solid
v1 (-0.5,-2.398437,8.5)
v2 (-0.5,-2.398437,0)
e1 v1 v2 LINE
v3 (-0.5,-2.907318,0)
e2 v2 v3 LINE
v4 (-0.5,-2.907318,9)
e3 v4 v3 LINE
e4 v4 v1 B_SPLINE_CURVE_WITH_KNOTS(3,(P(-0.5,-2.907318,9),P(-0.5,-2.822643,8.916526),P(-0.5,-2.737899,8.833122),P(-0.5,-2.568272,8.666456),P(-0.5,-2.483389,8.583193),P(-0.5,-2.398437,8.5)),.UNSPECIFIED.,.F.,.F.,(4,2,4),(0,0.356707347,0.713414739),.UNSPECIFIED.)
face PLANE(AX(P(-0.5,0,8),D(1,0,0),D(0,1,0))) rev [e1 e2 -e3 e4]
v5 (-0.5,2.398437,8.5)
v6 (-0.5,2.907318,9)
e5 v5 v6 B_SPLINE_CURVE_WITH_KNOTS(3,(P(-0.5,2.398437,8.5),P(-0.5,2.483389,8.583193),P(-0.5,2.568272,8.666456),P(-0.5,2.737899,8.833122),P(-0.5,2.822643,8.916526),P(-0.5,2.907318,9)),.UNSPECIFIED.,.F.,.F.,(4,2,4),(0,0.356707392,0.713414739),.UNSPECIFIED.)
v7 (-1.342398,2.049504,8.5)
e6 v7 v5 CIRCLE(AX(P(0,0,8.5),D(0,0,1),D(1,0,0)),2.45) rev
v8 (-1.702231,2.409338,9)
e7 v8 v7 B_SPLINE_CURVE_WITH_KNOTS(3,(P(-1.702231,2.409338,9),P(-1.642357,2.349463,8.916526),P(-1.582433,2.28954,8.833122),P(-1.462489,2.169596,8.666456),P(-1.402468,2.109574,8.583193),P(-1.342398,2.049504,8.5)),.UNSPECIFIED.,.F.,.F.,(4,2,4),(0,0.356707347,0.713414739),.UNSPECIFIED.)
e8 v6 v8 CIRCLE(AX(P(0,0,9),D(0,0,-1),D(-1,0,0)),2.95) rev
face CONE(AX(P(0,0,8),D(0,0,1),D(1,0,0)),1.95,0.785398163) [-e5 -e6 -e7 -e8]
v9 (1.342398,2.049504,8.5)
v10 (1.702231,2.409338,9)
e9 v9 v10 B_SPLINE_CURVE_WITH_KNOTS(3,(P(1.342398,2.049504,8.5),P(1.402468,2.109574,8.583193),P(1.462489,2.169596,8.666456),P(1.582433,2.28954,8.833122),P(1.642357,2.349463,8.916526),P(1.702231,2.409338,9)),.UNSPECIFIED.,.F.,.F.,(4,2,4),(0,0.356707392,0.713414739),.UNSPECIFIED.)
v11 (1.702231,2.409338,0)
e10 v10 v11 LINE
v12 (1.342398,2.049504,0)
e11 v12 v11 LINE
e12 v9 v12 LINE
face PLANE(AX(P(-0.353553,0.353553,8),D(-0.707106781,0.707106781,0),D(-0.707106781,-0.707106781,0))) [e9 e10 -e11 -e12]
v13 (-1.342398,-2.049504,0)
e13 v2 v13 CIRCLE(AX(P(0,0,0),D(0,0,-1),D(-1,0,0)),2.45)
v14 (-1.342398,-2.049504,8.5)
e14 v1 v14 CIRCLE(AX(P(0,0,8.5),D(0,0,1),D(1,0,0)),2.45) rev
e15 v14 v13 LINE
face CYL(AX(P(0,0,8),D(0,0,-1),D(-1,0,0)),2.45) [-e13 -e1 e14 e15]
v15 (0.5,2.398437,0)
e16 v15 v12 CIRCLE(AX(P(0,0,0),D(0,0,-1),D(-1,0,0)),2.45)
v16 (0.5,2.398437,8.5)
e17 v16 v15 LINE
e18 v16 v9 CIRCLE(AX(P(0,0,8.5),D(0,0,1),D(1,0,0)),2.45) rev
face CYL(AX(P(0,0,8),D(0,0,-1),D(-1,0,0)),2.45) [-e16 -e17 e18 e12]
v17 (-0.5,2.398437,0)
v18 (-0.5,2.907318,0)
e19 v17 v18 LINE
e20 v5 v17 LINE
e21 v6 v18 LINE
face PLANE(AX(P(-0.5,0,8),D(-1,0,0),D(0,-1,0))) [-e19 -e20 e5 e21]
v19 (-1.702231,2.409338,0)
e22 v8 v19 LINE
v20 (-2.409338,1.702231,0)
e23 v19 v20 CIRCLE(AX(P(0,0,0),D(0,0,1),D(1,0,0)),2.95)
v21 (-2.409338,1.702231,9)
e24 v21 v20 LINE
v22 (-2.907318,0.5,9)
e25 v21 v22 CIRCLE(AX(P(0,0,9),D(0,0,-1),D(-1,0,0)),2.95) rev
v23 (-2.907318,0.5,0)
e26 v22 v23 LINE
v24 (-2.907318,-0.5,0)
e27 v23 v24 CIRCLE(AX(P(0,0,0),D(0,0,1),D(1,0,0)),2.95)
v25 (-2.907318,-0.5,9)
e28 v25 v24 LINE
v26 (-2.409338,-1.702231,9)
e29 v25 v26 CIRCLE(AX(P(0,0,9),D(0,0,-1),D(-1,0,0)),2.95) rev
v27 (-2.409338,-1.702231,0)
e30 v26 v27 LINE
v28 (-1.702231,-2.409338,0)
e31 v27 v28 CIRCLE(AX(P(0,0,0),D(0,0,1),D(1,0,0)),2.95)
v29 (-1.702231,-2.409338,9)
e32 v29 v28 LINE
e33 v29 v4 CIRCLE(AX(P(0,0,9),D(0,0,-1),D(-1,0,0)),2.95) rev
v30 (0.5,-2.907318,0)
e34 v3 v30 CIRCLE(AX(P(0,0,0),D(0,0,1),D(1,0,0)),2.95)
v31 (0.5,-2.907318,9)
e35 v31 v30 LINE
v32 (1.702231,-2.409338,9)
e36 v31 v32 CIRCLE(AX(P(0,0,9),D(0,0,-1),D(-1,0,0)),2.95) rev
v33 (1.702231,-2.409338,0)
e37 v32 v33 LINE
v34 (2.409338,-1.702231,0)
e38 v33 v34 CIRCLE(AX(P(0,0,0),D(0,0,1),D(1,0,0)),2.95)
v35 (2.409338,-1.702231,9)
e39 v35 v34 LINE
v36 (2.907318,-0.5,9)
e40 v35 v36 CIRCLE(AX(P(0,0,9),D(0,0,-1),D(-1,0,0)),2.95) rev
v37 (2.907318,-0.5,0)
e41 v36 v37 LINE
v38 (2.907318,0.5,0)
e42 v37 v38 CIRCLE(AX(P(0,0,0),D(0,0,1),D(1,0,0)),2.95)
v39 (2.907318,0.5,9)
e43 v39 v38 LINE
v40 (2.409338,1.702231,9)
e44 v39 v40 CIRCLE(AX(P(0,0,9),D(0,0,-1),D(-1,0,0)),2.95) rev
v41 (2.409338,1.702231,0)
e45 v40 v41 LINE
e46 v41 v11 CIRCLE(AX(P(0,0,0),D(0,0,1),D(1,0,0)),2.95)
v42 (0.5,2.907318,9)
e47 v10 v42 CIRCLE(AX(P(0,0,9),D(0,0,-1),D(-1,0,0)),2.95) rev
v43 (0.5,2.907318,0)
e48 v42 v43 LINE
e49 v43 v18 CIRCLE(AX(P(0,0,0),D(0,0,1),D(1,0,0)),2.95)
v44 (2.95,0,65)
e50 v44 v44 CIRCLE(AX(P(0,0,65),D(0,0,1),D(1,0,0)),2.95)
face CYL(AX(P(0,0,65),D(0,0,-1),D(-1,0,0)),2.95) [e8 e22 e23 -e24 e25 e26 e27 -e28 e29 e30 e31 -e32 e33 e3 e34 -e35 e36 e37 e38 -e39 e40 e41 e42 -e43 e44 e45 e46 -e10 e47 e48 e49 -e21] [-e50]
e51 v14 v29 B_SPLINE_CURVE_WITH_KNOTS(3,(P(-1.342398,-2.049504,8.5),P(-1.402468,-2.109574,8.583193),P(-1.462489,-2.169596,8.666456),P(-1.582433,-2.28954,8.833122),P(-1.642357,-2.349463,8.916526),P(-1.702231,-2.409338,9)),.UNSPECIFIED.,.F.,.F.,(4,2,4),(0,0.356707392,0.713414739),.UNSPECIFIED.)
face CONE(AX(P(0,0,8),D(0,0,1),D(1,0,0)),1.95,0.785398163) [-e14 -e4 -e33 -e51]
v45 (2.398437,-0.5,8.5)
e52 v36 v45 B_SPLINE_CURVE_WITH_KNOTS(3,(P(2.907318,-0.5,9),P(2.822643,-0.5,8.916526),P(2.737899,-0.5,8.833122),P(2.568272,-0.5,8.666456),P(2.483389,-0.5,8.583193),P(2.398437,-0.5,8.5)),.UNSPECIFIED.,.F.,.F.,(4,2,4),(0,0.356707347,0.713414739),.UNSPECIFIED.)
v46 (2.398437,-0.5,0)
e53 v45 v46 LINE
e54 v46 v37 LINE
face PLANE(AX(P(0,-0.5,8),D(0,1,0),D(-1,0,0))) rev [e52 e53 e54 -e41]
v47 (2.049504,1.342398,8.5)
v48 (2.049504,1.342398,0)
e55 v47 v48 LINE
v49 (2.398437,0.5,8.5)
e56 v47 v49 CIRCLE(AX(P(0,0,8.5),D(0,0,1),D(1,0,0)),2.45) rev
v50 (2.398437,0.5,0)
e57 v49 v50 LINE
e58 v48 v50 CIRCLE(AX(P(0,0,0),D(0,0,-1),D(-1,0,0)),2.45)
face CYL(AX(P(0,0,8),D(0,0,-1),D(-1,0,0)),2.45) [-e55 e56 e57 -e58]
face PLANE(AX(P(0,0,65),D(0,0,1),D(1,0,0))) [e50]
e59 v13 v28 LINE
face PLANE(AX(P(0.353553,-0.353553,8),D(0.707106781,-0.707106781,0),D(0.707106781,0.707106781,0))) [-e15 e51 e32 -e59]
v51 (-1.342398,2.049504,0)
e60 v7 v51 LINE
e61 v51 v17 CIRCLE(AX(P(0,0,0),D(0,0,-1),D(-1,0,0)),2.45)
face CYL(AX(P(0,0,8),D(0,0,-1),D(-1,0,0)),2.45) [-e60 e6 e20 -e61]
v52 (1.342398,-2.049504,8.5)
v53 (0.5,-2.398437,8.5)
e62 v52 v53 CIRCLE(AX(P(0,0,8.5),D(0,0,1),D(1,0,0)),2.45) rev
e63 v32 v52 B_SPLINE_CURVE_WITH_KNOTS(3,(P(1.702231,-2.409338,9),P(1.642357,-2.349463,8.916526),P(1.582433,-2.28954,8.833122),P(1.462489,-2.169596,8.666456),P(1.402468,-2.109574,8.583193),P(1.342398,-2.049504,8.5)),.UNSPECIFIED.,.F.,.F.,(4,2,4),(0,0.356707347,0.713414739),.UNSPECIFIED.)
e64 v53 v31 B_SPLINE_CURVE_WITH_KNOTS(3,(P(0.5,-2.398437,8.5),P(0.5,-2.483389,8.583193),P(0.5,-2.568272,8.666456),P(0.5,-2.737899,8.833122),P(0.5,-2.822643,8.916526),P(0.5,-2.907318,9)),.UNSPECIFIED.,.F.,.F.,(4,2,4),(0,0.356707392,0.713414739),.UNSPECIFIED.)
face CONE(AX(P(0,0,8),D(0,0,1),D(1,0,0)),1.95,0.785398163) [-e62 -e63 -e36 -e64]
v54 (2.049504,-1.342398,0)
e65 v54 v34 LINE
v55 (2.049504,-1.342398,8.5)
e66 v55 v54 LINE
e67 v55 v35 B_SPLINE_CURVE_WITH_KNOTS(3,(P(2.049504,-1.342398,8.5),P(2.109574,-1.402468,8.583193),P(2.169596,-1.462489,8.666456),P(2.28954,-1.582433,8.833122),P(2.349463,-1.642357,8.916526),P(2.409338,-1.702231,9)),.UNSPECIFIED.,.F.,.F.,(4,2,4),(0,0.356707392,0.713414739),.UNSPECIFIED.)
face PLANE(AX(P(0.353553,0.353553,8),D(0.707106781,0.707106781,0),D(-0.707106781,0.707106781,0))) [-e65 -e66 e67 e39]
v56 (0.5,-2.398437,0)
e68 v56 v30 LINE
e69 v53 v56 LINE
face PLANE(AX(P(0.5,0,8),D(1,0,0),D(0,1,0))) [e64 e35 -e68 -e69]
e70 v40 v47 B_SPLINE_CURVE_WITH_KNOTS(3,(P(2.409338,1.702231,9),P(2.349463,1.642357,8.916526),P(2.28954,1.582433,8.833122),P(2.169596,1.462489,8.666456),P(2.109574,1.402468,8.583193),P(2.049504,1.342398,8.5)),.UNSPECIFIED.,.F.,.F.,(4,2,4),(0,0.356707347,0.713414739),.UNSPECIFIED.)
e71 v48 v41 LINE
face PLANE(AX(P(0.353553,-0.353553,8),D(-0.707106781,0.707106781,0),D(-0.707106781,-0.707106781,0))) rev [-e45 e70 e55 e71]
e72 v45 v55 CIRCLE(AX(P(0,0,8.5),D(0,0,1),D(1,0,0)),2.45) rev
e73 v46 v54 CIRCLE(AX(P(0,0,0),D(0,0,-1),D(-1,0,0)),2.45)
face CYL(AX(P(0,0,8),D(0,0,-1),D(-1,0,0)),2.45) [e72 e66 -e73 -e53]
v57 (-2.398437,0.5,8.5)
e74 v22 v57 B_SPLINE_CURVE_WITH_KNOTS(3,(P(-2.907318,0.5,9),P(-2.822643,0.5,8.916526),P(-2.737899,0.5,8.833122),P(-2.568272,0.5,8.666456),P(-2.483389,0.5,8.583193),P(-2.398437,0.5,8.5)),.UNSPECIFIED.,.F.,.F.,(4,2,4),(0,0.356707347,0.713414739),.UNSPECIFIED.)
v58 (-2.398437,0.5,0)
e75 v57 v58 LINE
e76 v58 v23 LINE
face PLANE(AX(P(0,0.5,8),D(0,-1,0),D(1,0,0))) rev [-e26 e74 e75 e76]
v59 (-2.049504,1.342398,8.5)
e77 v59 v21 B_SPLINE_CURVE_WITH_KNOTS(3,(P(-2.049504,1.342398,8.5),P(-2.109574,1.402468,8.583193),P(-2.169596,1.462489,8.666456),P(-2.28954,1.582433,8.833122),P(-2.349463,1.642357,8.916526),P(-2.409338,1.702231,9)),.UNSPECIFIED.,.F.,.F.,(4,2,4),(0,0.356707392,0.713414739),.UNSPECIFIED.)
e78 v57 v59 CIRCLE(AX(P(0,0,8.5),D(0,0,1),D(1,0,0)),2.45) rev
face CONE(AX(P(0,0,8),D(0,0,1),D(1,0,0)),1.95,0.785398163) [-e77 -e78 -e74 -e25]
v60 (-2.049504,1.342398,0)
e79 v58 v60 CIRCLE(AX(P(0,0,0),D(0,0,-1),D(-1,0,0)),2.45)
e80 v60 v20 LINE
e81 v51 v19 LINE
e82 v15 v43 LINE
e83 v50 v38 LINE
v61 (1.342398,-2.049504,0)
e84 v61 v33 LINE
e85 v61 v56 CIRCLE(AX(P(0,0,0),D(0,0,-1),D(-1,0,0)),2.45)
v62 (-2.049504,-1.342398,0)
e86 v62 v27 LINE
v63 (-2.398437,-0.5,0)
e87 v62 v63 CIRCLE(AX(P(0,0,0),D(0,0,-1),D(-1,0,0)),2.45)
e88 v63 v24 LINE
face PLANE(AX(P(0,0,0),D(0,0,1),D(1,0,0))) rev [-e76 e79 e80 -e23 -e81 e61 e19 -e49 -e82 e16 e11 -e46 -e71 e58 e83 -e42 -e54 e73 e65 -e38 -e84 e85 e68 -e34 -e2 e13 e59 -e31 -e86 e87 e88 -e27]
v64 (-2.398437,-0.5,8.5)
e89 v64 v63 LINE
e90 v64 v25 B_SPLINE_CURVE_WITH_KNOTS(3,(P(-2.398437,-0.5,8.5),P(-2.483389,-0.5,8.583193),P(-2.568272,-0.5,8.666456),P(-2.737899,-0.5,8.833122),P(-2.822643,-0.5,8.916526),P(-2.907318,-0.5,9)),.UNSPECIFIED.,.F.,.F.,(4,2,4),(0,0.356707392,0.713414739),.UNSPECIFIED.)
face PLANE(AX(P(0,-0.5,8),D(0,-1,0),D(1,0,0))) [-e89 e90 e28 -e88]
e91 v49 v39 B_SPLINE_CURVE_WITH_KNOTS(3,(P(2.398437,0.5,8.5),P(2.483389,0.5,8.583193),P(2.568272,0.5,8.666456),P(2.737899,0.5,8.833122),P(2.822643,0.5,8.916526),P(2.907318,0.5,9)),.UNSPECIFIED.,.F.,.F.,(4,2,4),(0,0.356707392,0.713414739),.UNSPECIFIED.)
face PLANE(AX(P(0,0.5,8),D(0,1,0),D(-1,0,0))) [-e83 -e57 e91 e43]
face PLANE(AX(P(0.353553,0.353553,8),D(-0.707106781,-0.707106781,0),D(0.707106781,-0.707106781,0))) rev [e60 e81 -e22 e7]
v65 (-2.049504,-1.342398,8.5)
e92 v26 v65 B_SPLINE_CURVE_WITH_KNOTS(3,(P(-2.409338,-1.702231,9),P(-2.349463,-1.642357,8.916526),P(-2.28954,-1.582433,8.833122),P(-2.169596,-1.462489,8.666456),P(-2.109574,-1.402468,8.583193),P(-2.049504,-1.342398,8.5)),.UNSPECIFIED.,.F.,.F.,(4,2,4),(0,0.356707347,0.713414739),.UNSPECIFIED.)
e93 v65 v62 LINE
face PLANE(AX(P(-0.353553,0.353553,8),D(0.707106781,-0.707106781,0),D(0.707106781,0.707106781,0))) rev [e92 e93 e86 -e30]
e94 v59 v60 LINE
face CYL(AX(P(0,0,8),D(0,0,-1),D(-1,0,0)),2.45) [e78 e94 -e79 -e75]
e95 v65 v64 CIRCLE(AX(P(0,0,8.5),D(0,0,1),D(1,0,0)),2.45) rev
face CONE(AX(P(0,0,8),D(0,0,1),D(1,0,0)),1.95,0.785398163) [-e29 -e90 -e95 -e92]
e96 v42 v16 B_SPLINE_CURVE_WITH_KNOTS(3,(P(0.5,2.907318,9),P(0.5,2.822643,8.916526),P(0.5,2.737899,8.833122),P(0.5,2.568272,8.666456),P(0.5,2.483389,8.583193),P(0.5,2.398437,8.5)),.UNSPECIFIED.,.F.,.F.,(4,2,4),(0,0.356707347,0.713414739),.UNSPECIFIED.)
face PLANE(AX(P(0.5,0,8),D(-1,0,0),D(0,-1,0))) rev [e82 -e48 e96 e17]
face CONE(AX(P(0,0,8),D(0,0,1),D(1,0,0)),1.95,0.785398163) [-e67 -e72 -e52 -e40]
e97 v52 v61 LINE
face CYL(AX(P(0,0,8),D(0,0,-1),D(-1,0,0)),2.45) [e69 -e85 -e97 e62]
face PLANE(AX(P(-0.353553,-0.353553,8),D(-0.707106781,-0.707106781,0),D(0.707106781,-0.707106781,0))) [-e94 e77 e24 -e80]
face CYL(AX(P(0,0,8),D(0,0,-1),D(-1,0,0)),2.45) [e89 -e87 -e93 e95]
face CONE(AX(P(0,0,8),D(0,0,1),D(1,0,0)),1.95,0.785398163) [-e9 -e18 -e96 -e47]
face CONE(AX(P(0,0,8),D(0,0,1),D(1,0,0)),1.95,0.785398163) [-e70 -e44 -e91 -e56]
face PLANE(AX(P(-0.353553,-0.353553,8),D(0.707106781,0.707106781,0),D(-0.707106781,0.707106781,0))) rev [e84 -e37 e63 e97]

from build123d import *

# Parameters (mm, degrees)
SKETCH1_R           = 2.95
BOSS_EXTRUDE1_DEPTH = 65
CUT_EXTRUDE1_DEPTH  = 8
CHAMFER1_SIZE       = 1


with BuildPart() as part:
    # Sketch1 → Boss-Extrude1 (new body)
    with BuildSketch(Plane.XY):
        Circle(SKETCH1_R)
    extrude(amount=BOSS_EXTRUDE1_DEPTH)

    # Sketch2 → Cut-Extrude1 (cut)
    with BuildSketch(Plane(origin=(0, 0, 0), x_dir=(-1, 0, 0), z_dir=(0, 0, -1))):
        with BuildLine():
            ThreePointArc((-2.398436991, 0.5), (-2.263504855, 0.937574409), (-2.049504451, 1.34239767))
            Line((-2.049504451, 1.34239767), (-2.409337912, 1.702231131))
            ThreePointArc((-2.409337912, 1.702231131), (-2.725444621, 1.128916125), (-2.907318352, 0.5))
            Line((-2.907318352, 0.5), (-2.398436991, 0.5))
        make_face()
        with BuildLine():
            ThreePointArc((-1.34239767, 2.049504451), (-0.937574409, 2.263504855), (-0.5, 2.398436991))
            Line((-0.5, 2.398436991), (-0.5, 2.907318352))
            ThreePointArc((-0.5, 2.907318352), (-1.128916125, 2.725444621), (-1.702231131, 2.409337912))
            Line((-1.702231131, 2.409337912), (-1.34239767, 2.049504451))
        make_face()
        with BuildLine():
            Line((0.5, 2.907318352), (0.5, 2.398436991))
            ThreePointArc((0.5, 2.398436991), (0.937574409, 2.263504855), (1.34239767, 2.049504451))
            Line((1.34239767, 2.049504451), (1.702231131, 2.409337912))
            ThreePointArc((1.702231131, 2.409337912), (1.128916125, 2.725444621), (0.5, 2.907318352))
        make_face()
        with BuildLine():
            Line((2.409337912, 1.702231131), (2.049504451, 1.34239767))
            ThreePointArc((2.049504451, 1.34239767), (2.263504855, 0.937574409), (2.398436991, 0.5))
            Line((2.398436991, 0.5), (2.907318352, 0.5))
            ThreePointArc((2.907318352, 0.5), (2.725444621, 1.128916125), (2.409337912, 1.702231131))
        make_face()
        with BuildLine():
            Line((2.907318352, -0.5), (2.398436991, -0.5))
            ThreePointArc((2.398436991, -0.5), (2.263504855, -0.937574409), (2.049504451, -1.34239767))
            Line((2.049504451, -1.34239767), (2.409337912, -1.702231131))
            ThreePointArc((2.409337912, -1.702231131), (2.725444621, -1.128916125), (2.907318352, -0.5))
        make_face()
        with BuildLine():
            Line((1.702231131, -2.409337912), (1.34239767, -2.049504451))
            ThreePointArc((1.34239767, -2.049504451), (0.937574409, -2.263504855), (0.5, -2.398436991))
            Line((0.5, -2.398436991), (0.5, -2.907318352))
            ThreePointArc((0.5, -2.907318352), (1.128916125, -2.725444621), (1.702231131, -2.409337912))
        make_face()
        with BuildLine():
            ThreePointArc((-0.5, -2.398436991), (-0.937574409, -2.263504855), (-1.34239767, -2.049504451))
            Line((-1.34239767, -2.049504451), (-1.702231131, -2.409337912))
            ThreePointArc((-1.702231131, -2.409337912), (-1.128916125, -2.725444621), (-0.5, -2.907318352))
            Line((-0.5, -2.907318352), (-0.5, -2.398436991))
        make_face()
        with BuildLine():
            ThreePointArc((-2.049504451, -1.34239767), (-2.263504855, -0.937574409), (-2.398436991, -0.5))
            Line((-2.398436991, -0.5), (-2.907318352, -0.5))
            ThreePointArc((-2.907318352, -0.5), (-2.725444621, -1.128916125), (-2.409337912, -1.702231131))
            Line((-2.409337912, -1.702231131), (-2.049504451, -1.34239767))
        make_face()
    extrude(amount=-CUT_EXTRUDE1_DEPTH, mode=Mode.SUBTRACT)

    # Chamfer1
    # the kernel refuses this chamfer: 1 mm, written as the material it takes off along each edge
    with BuildSketch(Plane(origin=(0, 0, 8), x_dir=(0.6453423073627431, -0.7638935176631171, 0), z_dir=(0.7638935176631171, 0.6453423073627431, 0))) as chamfer1_piece_1_section:
        Polygon((2.95, -CHAMFER1_SIZE), (2.95 - CHAMFER1_SIZE, 0), (2.95, 0), align=None)
    chamfer1_piece_1 = revolve(axis=Axis((0, 0, 8), (0, 0, -1)), revolution_arc=125.382690704, mode=Mode.PRIVATE)
    chamfer1_piece_1 = split(chamfer1_piece_1, bisect_by=Plane(origin=(0.5, 0, 8), z_dir=(1, 0, 0)), keep=Keep.TOP, mode=Mode.PRIVATE)
    chamfer1_piece_1 = split(chamfer1_piece_1, bisect_by=Plane(origin=(-0.353553391, -0.353553391, 8), z_dir=(-0.7071067811865415, -0.7071067811865537, 0)), keep=Keep.TOP, mode=Mode.PRIVATE)
    chamfer1_piece_1 = chamfer1_piece_1 - Plane(origin=(0, 0, 8), x_dir=(0.20408163265306725, -0.9789538738948115, 0), z_dir=(0, 0, -1)) * Cylinder(2.45, 12, mode=Mode.PRIVATE)
    add(chamfer1_piece_1, mode=Mode.SUBTRACT)
    with BuildSketch(Plane(origin=(0, 0, 8), x_dir=(0.6453423073627431, -0.7638935176631171, 0), z_dir=(0.7638935176631171, 0.6453423073627431, 0))) as chamfer1_piece_2_section:
        Polygon((2.95, -CHAMFER1_SIZE), (2.95 - CHAMFER1_SIZE, 0), (2.95, 0), align=None)
    chamfer1_piece_2 = revolve(axis=Axis((0, 0, 8), (0, 0, -1)), revolution_arc=125.382690704, mode=Mode.PRIVATE)
    chamfer1_piece_2 = split(chamfer1_piece_2, bisect_by=Plane(origin=(0.353553391, -0.353553391, 8), z_dir=(0.7071067811865517, -0.7071067811865434, 0)), keep=Keep.TOP, mode=Mode.PRIVATE)
    chamfer1_piece_2 = split(chamfer1_piece_2, bisect_by=Plane(origin=(-0.5, 0, 8), z_dir=(-1, 0, 0)), keep=Keep.TOP, mode=Mode.PRIVATE)
    chamfer1_piece_2 = chamfer1_piece_2 - Plane(origin=(0, 0, 8), x_dir=(0.20408163265306725, -0.9789538738948115, 0), z_dir=(0, 0, -1)) * Cylinder(2.45, 12, mode=Mode.PRIVATE)
    add(chamfer1_piece_2, mode=Mode.SUBTRACT)
    with BuildSketch(Plane(origin=(0, 0, 8), x_dir=(0.6453423073627431, -0.7638935176631171, 0), z_dir=(0.7638935176631171, 0.6453423073627431, 0))) as chamfer1_piece_3_section:
        Polygon((2.95, -CHAMFER1_SIZE), (2.95 - CHAMFER1_SIZE, 0), (2.95, 0), align=None)
    chamfer1_piece_3 = revolve(axis=Axis((0, 0, 8), (0, 0, -1)), revolution_arc=125.382690704, mode=Mode.PRIVATE)
    chamfer1_piece_3 = split(chamfer1_piece_3, bisect_by=Plane(origin=(0, -0.5, 8), z_dir=(0, -1, 0)), keep=Keep.TOP, mode=Mode.PRIVATE)
    chamfer1_piece_3 = split(chamfer1_piece_3, bisect_by=Plane(origin=(-0.353553391, 0.353553391, 8), z_dir=(-0.7071067811865515, 0.7071067811865437, 0)), keep=Keep.TOP, mode=Mode.PRIVATE)
    chamfer1_piece_3 = chamfer1_piece_3 - Plane(origin=(0, 0, 8), x_dir=(0.20408163265306725, -0.9789538738948115, 0), z_dir=(0, 0, -1)) * Cylinder(2.45, 12, mode=Mode.PRIVATE)
    add(chamfer1_piece_3, mode=Mode.SUBTRACT)
    with BuildSketch(Plane(origin=(0, 0, 8), x_dir=(-0.083828364721268, -0.9964802081668046, 0), z_dir=(0.9964802081668046, -0.083828364721268, 0))) as chamfer1_piece_4_section:
        Polygon((2.95, -CHAMFER1_SIZE), (2.95 - CHAMFER1_SIZE, 0), (2.95, 0), align=None)
    chamfer1_piece_4 = revolve(axis=Axis((0, 0, 8), (0, 0, -1)), revolution_arc=125.382690704, mode=Mode.PRIVATE)
    chamfer1_piece_4 = split(chamfer1_piece_4, bisect_by=Plane(origin=(0.353553391, -0.353553391, 8), z_dir=(0.7071067811865517, -0.7071067811865434, 0)), keep=Keep.TOP, mode=Mode.PRIVATE)
    chamfer1_piece_4 = split(chamfer1_piece_4, bisect_by=Plane(origin=(-0.5, 0, 8), z_dir=(-1, 0, 0)), keep=Keep.TOP, mode=Mode.PRIVATE)
    chamfer1_piece_4 = chamfer1_piece_4 - Plane(origin=(0, 0, 8), x_dir=(-0.5479174163352548, -0.8365324290644679, 0), z_dir=(0, 0, -1)) * Cylinder(2.45, 12, mode=Mode.PRIVATE)
    add(chamfer1_piece_4, mode=Mode.SUBTRACT)
    with BuildSketch(Plane(origin=(0, 0, 8), x_dir=(-0.083828364721268, -0.9964802081668046, 0), z_dir=(0.9964802081668046, -0.083828364721268, 0))) as chamfer1_piece_5_section:
        Polygon((2.95, -CHAMFER1_SIZE), (2.95 - CHAMFER1_SIZE, 0), (2.95, 0), align=None)
    chamfer1_piece_5 = revolve(axis=Axis((0, 0, 8), (0, 0, -1)), revolution_arc=125.382690704, mode=Mode.PRIVATE)
    chamfer1_piece_5 = split(chamfer1_piece_5, bisect_by=Plane(origin=(0, -0.5, 8), z_dir=(0, -1, 0)), keep=Keep.TOP, mode=Mode.PRIVATE)
    chamfer1_piece_5 = split(chamfer1_piece_5, bisect_by=Plane(origin=(-0.353553391, 0.353553391, 8), z_dir=(-0.7071067811865515, 0.7071067811865437, 0)), keep=Keep.TOP, mode=Mode.PRIVATE)
    chamfer1_piece_5 = chamfer1_piece_5 - Plane(origin=(0, 0, 8), x_dir=(-0.5479174163352548, -0.8365324290644679, 0), z_dir=(0, 0, -1)) * Cylinder(2.45, 12, mode=Mode.PRIVATE)
    add(chamfer1_piece_5, mode=Mode.SUBTRACT)
    with BuildSketch(Plane(origin=(0, 0, 8), x_dir=(-0.083828364721268, -0.9964802081668046, 0), z_dir=(0.9964802081668046, -0.083828364721268, 0))) as chamfer1_piece_6_section:
        Polygon((2.95, -CHAMFER1_SIZE), (2.95 - CHAMFER1_SIZE, 0), (2.95, 0), align=None)
    chamfer1_piece_6 = revolve(axis=Axis((0, 0, 8), (0, 0, -1)), revolution_arc=125.382690704, mode=Mode.PRIVATE)
    chamfer1_piece_6 = split(chamfer1_piece_6, bisect_by=Plane(origin=(-0.353553391, -0.353553391, 8), z_dir=(-0.7071067811865454, -0.7071067811865497, 0)), keep=Keep.TOP, mode=Mode.PRIVATE)
    chamfer1_piece_6 = split(chamfer1_piece_6, bisect_by=Plane(origin=(0, 0.5, 8), z_dir=(0, 1, 0)), keep=Keep.TOP, mode=Mode.PRIVATE)
    chamfer1_piece_6 = chamfer1_piece_6 - Plane(origin=(0, 0, 8), x_dir=(-0.5479174163352548, -0.8365324290644679, 0), z_dir=(0, 0, -1)) * Cylinder(2.45, 12, mode=Mode.PRIVATE)
    add(chamfer1_piece_6, mode=Mode.SUBTRACT)
    with BuildSketch(Plane(origin=(0, 0, 8), x_dir=(-0.7638935176631205, -0.645342307362739, 0), z_dir=(0.645342307362739, -0.7638935176631205, 0))) as chamfer1_piece_7_section:
        Polygon((2.95, -CHAMFER1_SIZE), (2.95 - CHAMFER1_SIZE, 0), (2.95, 0), align=None)
    chamfer1_piece_7 = revolve(axis=Axis((0, 0, 8), (0, 0, -1)), revolution_arc=125.382690704, mode=Mode.PRIVATE)
    chamfer1_piece_7 = split(chamfer1_piece_7, bisect_by=Plane(origin=(0, -0.5, 8), z_dir=(0, -1, 0)), keep=Keep.TOP, mode=Mode.PRIVATE)
    chamfer1_piece_7 = split(chamfer1_piece_7, bisect_by=Plane(origin=(-0.353553391, 0.353553391, 8), z_dir=(-0.7071067811865515, 0.7071067811865437, 0)), keep=Keep.TOP, mode=Mode.PRIVATE)
    chamfer1_piece_7 = chamfer1_piece_7 - Plane(origin=(0, 0, 8), x_dir=(-0.9789538738948118, -0.20408163265306617, 0), z_dir=(0, 0, -1)) * Cylinder(2.45, 12, mode=Mode.PRIVATE)
    add(chamfer1_piece_7, mode=Mode.SUBTRACT)
    with BuildSketch(Plane(origin=(0, 0, 8), x_dir=(-0.7638935176631205, -0.645342307362739, 0), z_dir=(0.645342307362739, -0.7638935176631205, 0))) as chamfer1_piece_8_section:
        Polygon((2.95, -CHAMFER1_SIZE), (2.95 - CHAMFER1_SIZE, 0), (2.95, 0), align=None)
    chamfer1_piece_8 = revolve(axis=Axis((0, 0, 8), (0, 0, -1)), revolution_arc=125.382690704, mode=Mode.PRIVATE)
    chamfer1_piece_8 = split(chamfer1_piece_8, bisect_by=Plane(origin=(-0.353553391, -0.353553391, 8), z_dir=(-0.7071067811865454, -0.7071067811865497, 0)), keep=Keep.TOP, mode=Mode.PRIVATE)
    chamfer1_piece_8 = split(chamfer1_piece_8, bisect_by=Plane(origin=(0, 0.5, 8), z_dir=(0, 1, 0)), keep=Keep.TOP, mode=Mode.PRIVATE)
    chamfer1_piece_8 = chamfer1_piece_8 - Plane(origin=(0, 0, 8), x_dir=(-0.9789538738948118, -0.20408163265306617, 0), z_dir=(0, 0, -1)) * Cylinder(2.45, 12, mode=Mode.PRIVATE)
    add(chamfer1_piece_8, mode=Mode.SUBTRACT)
    with BuildSketch(Plane(origin=(0, 0, 8), x_dir=(-0.7638935176631205, -0.645342307362739, 0), z_dir=(0.645342307362739, -0.7638935176631205, 0))) as chamfer1_piece_9_section:
        Polygon((2.95, -CHAMFER1_SIZE), (2.95 - CHAMFER1_SIZE, 0), (2.95, 0), align=None)
    chamfer1_piece_9 = revolve(axis=Axis((0, 0, 8), (0, 0, -1)), revolution_arc=125.382690704, mode=Mode.PRIVATE)
    chamfer1_piece_9 = split(chamfer1_piece_9, bisect_by=Plane(origin=(-0.5, 0, 8), z_dir=(-1, 0, 0)), keep=Keep.TOP, mode=Mode.PRIVATE)
    chamfer1_piece_9 = split(chamfer1_piece_9, bisect_by=Plane(origin=(0.353553391, 0.353553391, 8), z_dir=(0.7071067811865474, 0.7071067811865477, 0)), keep=Keep.TOP, mode=Mode.PRIVATE)
    chamfer1_piece_9 = chamfer1_piece_9 - Plane(origin=(0, 0, 8), x_dir=(-0.9789538738948118, -0.20408163265306617, 0), z_dir=(0, 0, -1)) * Cylinder(2.45, 12, mode=Mode.PRIVATE)
    add(chamfer1_piece_9, mode=Mode.SUBTRACT)
    with BuildSketch(Plane(origin=(0, 0, 8), x_dir=(-0.9964802081668033, 0.08382836472128195, 0), z_dir=(-0.08382836472128195, -0.9964802081668033, 0))) as chamfer1_piece_10_section:
        Polygon((2.95, -CHAMFER1_SIZE), (2.95 - CHAMFER1_SIZE, 0), (2.95, 0), align=None)
    chamfer1_piece_10 = revolve(axis=Axis((0, 0, 8), (0, 0, -1)), revolution_arc=125.382690704, mode=Mode.PRIVATE)
    chamfer1_piece_10 = split(chamfer1_piece_10, bisect_by=Plane(origin=(-0.353553391, -0.353553391, 8), z_dir=(-0.7071067811865454, -0.7071067811865497, 0)), keep=Keep.TOP, mode=Mode.PRIVATE)
    chamfer1_piece_10 = split(chamfer1_piece_10, bisect_by=Plane(origin=(0, 0.5, 8), z_dir=(0, 1, 0)), keep=Keep.TOP, mode=Mode.PRIVATE)
    chamfer1_piece_10 = chamfer1_piece_10 - Plane(origin=(0, 0, 8), x_dir=(-0.836532429064466, 0.5479174163352577, 0), z_dir=(0, 0, -1)) * Cylinder(2.45, 12, mode=Mode.PRIVATE)
    add(chamfer1_piece_10, mode=Mode.SUBTRACT)
    with BuildSketch(Plane(origin=(0, 0, 8), x_dir=(-0.9964802081668033, 0.08382836472128195, 0), z_dir=(-0.08382836472128195, -0.9964802081668033, 0))) as chamfer1_piece_11_section:
        Polygon((2.95, -CHAMFER1_SIZE), (2.95 - CHAMFER1_SIZE, 0), (2.95, 0), align=None)
    chamfer1_piece_11 = revolve(axis=Axis((0, 0, 8), (0, 0, -1)), revolution_arc=125.382690704, mode=Mode.PRIVATE)
    chamfer1_piece_11 = split(chamfer1_piece_11, bisect_by=Plane(origin=(-0.5, 0, 8), z_dir=(-1, 0, 0)), keep=Keep.TOP, mode=Mode.PRIVATE)
    chamfer1_piece_11 = split(chamfer1_piece_11, bisect_by=Plane(origin=(0.353553391, 0.353553391, 8), z_dir=(0.7071067811865474, 0.7071067811865477, 0)), keep=Keep.TOP, mode=Mode.PRIVATE)
    chamfer1_piece_11 = chamfer1_piece_11 - Plane(origin=(0, 0, 8), x_dir=(-0.836532429064466, 0.5479174163352577, 0), z_dir=(0, 0, -1)) * Cylinder(2.45, 12, mode=Mode.PRIVATE)
    add(chamfer1_piece_11, mode=Mode.SUBTRACT)
    with BuildSketch(Plane(origin=(0, 0, 8), x_dir=(-0.9964802081668033, 0.08382836472128195, 0), z_dir=(-0.08382836472128195, -0.9964802081668033, 0))) as chamfer1_piece_12_section:
        Polygon((2.95, -CHAMFER1_SIZE), (2.95 - CHAMFER1_SIZE, 0), (2.95, 0), align=None)
    chamfer1_piece_12 = revolve(axis=Axis((0, 0, 8), (0, 0, -1)), revolution_arc=125.382690704, mode=Mode.PRIVATE)
    chamfer1_piece_12 = split(chamfer1_piece_12, bisect_by=Plane(origin=(-0.353553391, 0.353553391, 8), z_dir=(-0.7071067811865565, 0.7071067811865386, 0)), keep=Keep.TOP, mode=Mode.PRIVATE)
    chamfer1_piece_12 = split(chamfer1_piece_12, bisect_by=Plane(origin=(0.5, 0, 8), z_dir=(1, 0, 0)), keep=Keep.TOP, mode=Mode.PRIVATE)
    chamfer1_piece_12 = chamfer1_piece_12 - Plane(origin=(0, 0, 8), x_dir=(-0.836532429064466, 0.5479174163352577, 0), z_dir=(0, 0, -1)) * Cylinder(2.45, 12, mode=Mode.PRIVATE)
    add(chamfer1_piece_12, mode=Mode.SUBTRACT)
    with BuildSketch(Plane(origin=(0, 0, 8), x_dir=(0.9964802081668043, -0.08382836472127134, 0), z_dir=(0.08382836472127134, 0.9964802081668043, 0))) as chamfer1_piece_13_section:
        Polygon((2.95, -CHAMFER1_SIZE), (2.95 - CHAMFER1_SIZE, 0), (2.95, 0), align=None)
    chamfer1_piece_13 = revolve(axis=Axis((0, 0, 8), (0, 0, -1)), revolution_arc=125.382690704, mode=Mode.PRIVATE)
    chamfer1_piece_13 = split(chamfer1_piece_13, bisect_by=Plane(origin=(0.353553391, 0.353553391, 8), z_dir=(0.707106781186541, 0.7071067811865541, 0)), keep=Keep.TOP, mode=Mode.PRIVATE)
    chamfer1_piece_13 = split(chamfer1_piece_13, bisect_by=Plane(origin=(0, -0.5, 8), z_dir=(0, -1, 0)), keep=Keep.TOP, mode=Mode.PRIVATE)
    chamfer1_piece_13 = chamfer1_piece_13 - Plane(origin=(0, 0, 8), x_dir=(0.8365324290644678, -0.5479174163352549, 0), z_dir=(0, 0, -1)) * Cylinder(2.45, 12, mode=Mode.PRIVATE)
    add(chamfer1_piece_13, mode=Mode.SUBTRACT)
    with BuildSketch(Plane(origin=(0, 0, 8), x_dir=(0.9964802081668043, -0.08382836472127134, 0), z_dir=(0.08382836472127134, 0.9964802081668043, 0))) as chamfer1_piece_14_section:
        Polygon((2.95, -CHAMFER1_SIZE), (2.95 - CHAMFER1_SIZE, 0), (2.95, 0), align=None)
    chamfer1_piece_14 = revolve(axis=Axis((0, 0, 8), (0, 0, -1)), revolution_arc=125.382690704, mode=Mode.PRIVATE)
    chamfer1_piece_14 = split(chamfer1_piece_14, bisect_by=Plane(origin=(0.5, 0, 8), z_dir=(1, 0, 0)), keep=Keep.TOP, mode=Mode.PRIVATE)
    chamfer1_piece_14 = split(chamfer1_piece_14, bisect_by=Plane(origin=(-0.353553391, -0.353553391, 8), z_dir=(-0.7071067811865415, -0.7071067811865537, 0)), keep=Keep.TOP, mode=Mode.PRIVATE)
    chamfer1_piece_14 = chamfer1_piece_14 - Plane(origin=(0, 0, 8), x_dir=(0.8365324290644678, -0.5479174163352549, 0), z_dir=(0, 0, -1)) * Cylinder(2.45, 12, mode=Mode.PRIVATE)
    add(chamfer1_piece_14, mode=Mode.SUBTRACT)
    with BuildSketch(Plane(origin=(0, 0, 8), x_dir=(0.9964802081668043, -0.08382836472127134, 0), z_dir=(0.08382836472127134, 0.9964802081668043, 0))) as chamfer1_piece_15_section:
        Polygon((2.95, -CHAMFER1_SIZE), (2.95 - CHAMFER1_SIZE, 0), (2.95, 0), align=None)
    chamfer1_piece_15 = revolve(axis=Axis((0, 0, 8), (0, 0, -1)), revolution_arc=125.382690704, mode=Mode.PRIVATE)
    chamfer1_piece_15 = split(chamfer1_piece_15, bisect_by=Plane(origin=(0.353553391, -0.353553391, 8), z_dir=(0.7071067811865517, -0.7071067811865434, 0)), keep=Keep.TOP, mode=Mode.PRIVATE)
    chamfer1_piece_15 = split(chamfer1_piece_15, bisect_by=Plane(origin=(-0.5, 0, 8), z_dir=(-1, 0, 0)), keep=Keep.TOP, mode=Mode.PRIVATE)
    chamfer1_piece_15 = chamfer1_piece_15 - Plane(origin=(0, 0, 8), x_dir=(0.8365324290644678, -0.5479174163352549, 0), z_dir=(0, 0, -1)) * Cylinder(2.45, 12, mode=Mode.PRIVATE)
    add(chamfer1_piece_15, mode=Mode.SUBTRACT)
    with BuildSketch(Plane(origin=(0, 0, 8), x_dir=(0.7638935176631216, 0.6453423073627377, 0), z_dir=(-0.6453423073627377, 0.7638935176631216, 0))) as chamfer1_piece_16_section:
        Polygon((2.95, -CHAMFER1_SIZE), (2.95 - CHAMFER1_SIZE, 0), (2.95, 0), align=None)
    chamfer1_piece_16 = revolve(axis=Axis((0, 0, 8), (0, 0, -1)), revolution_arc=125.382690704, mode=Mode.PRIVATE)
    chamfer1_piece_16 = split(chamfer1_piece_16, bisect_by=Plane(origin=(0, 0.5, 8), z_dir=(0, 1, 0)), keep=Keep.TOP, mode=Mode.PRIVATE)
    chamfer1_piece_16 = split(chamfer1_piece_16, bisect_by=Plane(origin=(0.353553391, -0.353553391, 8), z_dir=(0.707106781186556, -0.707106781186539, 0)), keep=Keep.TOP, mode=Mode.PRIVATE)
    chamfer1_piece_16 = chamfer1_piece_16 - Plane(origin=(0, 0, 8), x_dir=(0.8365324290644678, -0.5479174163352549, 0), z_dir=(0, 0, -1)) * Cylinder(2.45, 12, mode=Mode.PRIVATE)
    add(chamfer1_piece_16, mode=Mode.SUBTRACT)
    with BuildSketch(Plane(origin=(0, 0, 8), x_dir=(0.7638935176631216, 0.6453423073627377, 0), z_dir=(-0.6453423073627377, 0.7638935176631216, 0))) as chamfer1_piece_17_section:
        Polygon((2.95, -CHAMFER1_SIZE), (2.95 - CHAMFER1_SIZE, 0), (2.95, 0), align=None)
    chamfer1_piece_17 = revolve(axis=Axis((0, 0, 8), (0, 0, -1)), revolution_arc=125.382690704, mode=Mode.PRIVATE)
    chamfer1_piece_17 = split(chamfer1_piece_17, bisect_by=Plane(origin=(0.353553391, 0.353553391, 8), z_dir=(0.707106781186541, 0.7071067811865541, 0)), keep=Keep.TOP, mode=Mode.PRIVATE)
    chamfer1_piece_17 = split(chamfer1_piece_17, bisect_by=Plane(origin=(0, -0.5, 8), z_dir=(0, -1, 0)), keep=Keep.TOP, mode=Mode.PRIVATE)
    chamfer1_piece_17 = chamfer1_piece_17 - Plane(origin=(0, 0, 8), x_dir=(0.8365324290644678, -0.5479174163352549, 0), z_dir=(0, 0, -1)) * Cylinder(2.45, 12, mode=Mode.PRIVATE)
    add(chamfer1_piece_17, mode=Mode.SUBTRACT)
    with BuildSketch(Plane(origin=(0, 0, 8), x_dir=(0.7638935176631216, 0.6453423073627377, 0), z_dir=(-0.6453423073627377, 0.7638935176631216, 0))) as chamfer1_piece_18_section:
        Polygon((2.95, -CHAMFER1_SIZE), (2.95 - CHAMFER1_SIZE, 0), (2.95, 0), align=None)
    chamfer1_piece_18 = revolve(axis=Axis((0, 0, 8), (0, 0, -1)), revolution_arc=125.382690704, mode=Mode.PRIVATE)
    chamfer1_piece_18 = split(chamfer1_piece_18, bisect_by=Plane(origin=(0.5, 0, 8), z_dir=(1, 0, 0)), keep=Keep.TOP, mode=Mode.PRIVATE)
    chamfer1_piece_18 = split(chamfer1_piece_18, bisect_by=Plane(origin=(-0.353553391, -0.353553391, 8), z_dir=(-0.7071067811865415, -0.7071067811865537, 0)), keep=Keep.TOP, mode=Mode.PRIVATE)
    chamfer1_piece_18 = chamfer1_piece_18 - Plane(origin=(0, 0, 8), x_dir=(0.8365324290644678, -0.5479174163352549, 0), z_dir=(0, 0, -1)) * Cylinder(2.45, 12, mode=Mode.PRIVATE)
    add(chamfer1_piece_18, mode=Mode.SUBTRACT)
    with BuildSketch(Plane(origin=(0, 0, 8), x_dir=(0.08382836472126272, 0.996480208166805, 0), z_dir=(-0.996480208166805, 0.08382836472126272, 0))) as chamfer1_piece_19_section:
        Polygon((2.95, -CHAMFER1_SIZE), (2.95 - CHAMFER1_SIZE, 0), (2.95, 0), align=None)
    chamfer1_piece_19 = revolve(axis=Axis((0, 0, 8), (0, 0, -1)), revolution_arc=125.382690704, mode=Mode.PRIVATE)
    chamfer1_piece_19 = split(chamfer1_piece_19, bisect_by=Plane(origin=(-0.353553391, 0.353553391, 8), z_dir=(-0.7071067811865565, 0.7071067811865386, 0)), keep=Keep.TOP, mode=Mode.PRIVATE)
    chamfer1_piece_19 = split(chamfer1_piece_19, bisect_by=Plane(origin=(0.5, 0, 8), z_dir=(1, 0, 0)), keep=Keep.TOP, mode=Mode.PRIVATE)
    chamfer1_piece_19 = chamfer1_piece_19 - Plane(origin=(0, 0, 8), x_dir=(0.8365324290644678, -0.5479174163352549, 0), z_dir=(0, 0, -1)) * Cylinder(2.45, 12, mode=Mode.PRIVATE)
    add(chamfer1_piece_19, mode=Mode.SUBTRACT)
    with BuildSketch(Plane(origin=(0, 0, 8), x_dir=(0.08382836472126272, 0.996480208166805, 0), z_dir=(-0.996480208166805, 0.08382836472126272, 0))) as chamfer1_piece_20_section:
        Polygon((2.95, -CHAMFER1_SIZE), (2.95 - CHAMFER1_SIZE, 0), (2.95, 0), align=None)
    chamfer1_piece_20 = revolve(axis=Axis((0, 0, 8), (0, 0, -1)), revolution_arc=125.382690704, mode=Mode.PRIVATE)
    chamfer1_piece_20 = split(chamfer1_piece_20, bisect_by=Plane(origin=(0, 0.5, 8), z_dir=(0, 1, 0)), keep=Keep.TOP, mode=Mode.PRIVATE)
    chamfer1_piece_20 = split(chamfer1_piece_20, bisect_by=Plane(origin=(0.353553391, -0.353553391, 8), z_dir=(0.707106781186556, -0.707106781186539, 0)), keep=Keep.TOP, mode=Mode.PRIVATE)
    chamfer1_piece_20 = chamfer1_piece_20 - Plane(origin=(0, 0, 8), x_dir=(0.8365324290644678, -0.5479174163352549, 0), z_dir=(0, 0, -1)) * Cylinder(2.45, 12, mode=Mode.PRIVATE)
    add(chamfer1_piece_20, mode=Mode.SUBTRACT)
    with BuildSketch(Plane(origin=(0, 0, 8), x_dir=(0.08382836472126272, 0.996480208166805, 0), z_dir=(-0.996480208166805, 0.08382836472126272, 0))) as chamfer1_piece_21_section:
        Polygon((2.95, -CHAMFER1_SIZE), (2.95 - CHAMFER1_SIZE, 0), (2.95, 0), align=None)
    chamfer1_piece_21 = revolve(axis=Axis((0, 0, 8), (0, 0, -1)), revolution_arc=125.382690704, mode=Mode.PRIVATE)
    chamfer1_piece_21 = split(chamfer1_piece_21, bisect_by=Plane(origin=(0.353553391, 0.353553391, 8), z_dir=(0.707106781186541, 0.7071067811865541, 0)), keep=Keep.TOP, mode=Mode.PRIVATE)
    chamfer1_piece_21 = split(chamfer1_piece_21, bisect_by=Plane(origin=(0, -0.5, 8), z_dir=(0, -1, 0)), keep=Keep.TOP, mode=Mode.PRIVATE)
    chamfer1_piece_21 = chamfer1_piece_21 - Plane(origin=(0, 0, 8), x_dir=(0.8365324290644678, -0.5479174163352549, 0), z_dir=(0, 0, -1)) * Cylinder(2.45, 12, mode=Mode.PRIVATE)
    add(chamfer1_piece_21, mode=Mode.SUBTRACT)
    with BuildSketch(Plane(origin=(0, 0, 8), x_dir=(-0.6453423073627307, 0.7638935176631274, 0), z_dir=(-0.7638935176631274, -0.6453423073627307, 0))) as chamfer1_piece_22_section:
        Polygon((2.95, -CHAMFER1_SIZE), (2.95 - CHAMFER1_SIZE, 0), (2.95, 0), align=None)
    chamfer1_piece_22 = revolve(axis=Axis((0, 0, 8), (0, 0, -1)), revolution_arc=125.382690704, mode=Mode.PRIVATE)
    chamfer1_piece_22 = split(chamfer1_piece_22, bisect_by=Plane(origin=(-0.5, 0, 8), z_dir=(-1, 0, 0)), keep=Keep.TOP, mode=Mode.PRIVATE)
    chamfer1_piece_22 = split(chamfer1_piece_22, bisect_by=Plane(origin=(0.353553391, 0.353553391, 8), z_dir=(0.7071067811865474, 0.7071067811865477, 0)), keep=Keep.TOP, mode=Mode.PRIVATE)
    chamfer1_piece_22 = chamfer1_piece_22 - Plane(origin=(0, 0, 8), x_dir=(-0.2040816326530623, 0.9789538738948126, 0), z_dir=(0, 0, -1)) * Cylinder(2.45, 12, mode=Mode.PRIVATE)
    add(chamfer1_piece_22, mode=Mode.SUBTRACT)
    with BuildSketch(Plane(origin=(0, 0, 8), x_dir=(-0.6453423073627307, 0.7638935176631274, 0), z_dir=(-0.7638935176631274, -0.6453423073627307, 0))) as chamfer1_piece_23_section:
        Polygon((2.95, -CHAMFER1_SIZE), (2.95 - CHAMFER1_SIZE, 0), (2.95, 0), align=None)
    chamfer1_piece_23 = revolve(axis=Axis((0, 0, 8), (0, 0, -1)), revolution_arc=125.382690704, mode=Mode.PRIVATE)
    chamfer1_piece_23 = split(chamfer1_piece_23, bisect_by=Plane(origin=(-0.353553391, 0.353553391, 8), z_dir=(-0.7071067811865565, 0.7071067811865386, 0)), keep=Keep.TOP, mode=Mode.PRIVATE)
    chamfer1_piece_23 = split(chamfer1_piece_23, bisect_by=Plane(origin=(0.5, 0, 8), z_dir=(1, 0, 0)), keep=Keep.TOP, mode=Mode.PRIVATE)
    chamfer1_piece_23 = chamfer1_piece_23 - Plane(origin=(0, 0, 8), x_dir=(-0.2040816326530623, 0.9789538738948126, 0), z_dir=(0, 0, -1)) * Cylinder(2.45, 12, mode=Mode.PRIVATE)
    add(chamfer1_piece_23, mode=Mode.SUBTRACT)
    with BuildSketch(Plane(origin=(0, 0, 8), x_dir=(-0.6453423073627307, 0.7638935176631274, 0), z_dir=(-0.7638935176631274, -0.6453423073627307, 0))) as chamfer1_piece_24_section:
        Polygon((2.95, -CHAMFER1_SIZE), (2.95 - CHAMFER1_SIZE, 0), (2.95, 0), align=None)
    chamfer1_piece_24 = revolve(axis=Axis((0, 0, 8), (0, 0, -1)), revolution_arc=125.382690704, mode=Mode.PRIVATE)
    chamfer1_piece_24 = split(chamfer1_piece_24, bisect_by=Plane(origin=(0, 0.5, 8), z_dir=(0, 1, 0)), keep=Keep.TOP, mode=Mode.PRIVATE)
    chamfer1_piece_24 = split(chamfer1_piece_24, bisect_by=Plane(origin=(0.353553391, -0.353553391, 8), z_dir=(0.707106781186556, -0.707106781186539, 0)), keep=Keep.TOP, mode=Mode.PRIVATE)
    chamfer1_piece_24 = chamfer1_piece_24 - Plane(origin=(0, 0, 8), x_dir=(-0.2040816326530623, 0.9789538738948126, 0), z_dir=(0, 0, -1)) * Cylinder(2.45, 12, mode=Mode.PRIVATE)
    add(chamfer1_piece_24, mode=Mode.SUBTRACT)


solid = part.part
